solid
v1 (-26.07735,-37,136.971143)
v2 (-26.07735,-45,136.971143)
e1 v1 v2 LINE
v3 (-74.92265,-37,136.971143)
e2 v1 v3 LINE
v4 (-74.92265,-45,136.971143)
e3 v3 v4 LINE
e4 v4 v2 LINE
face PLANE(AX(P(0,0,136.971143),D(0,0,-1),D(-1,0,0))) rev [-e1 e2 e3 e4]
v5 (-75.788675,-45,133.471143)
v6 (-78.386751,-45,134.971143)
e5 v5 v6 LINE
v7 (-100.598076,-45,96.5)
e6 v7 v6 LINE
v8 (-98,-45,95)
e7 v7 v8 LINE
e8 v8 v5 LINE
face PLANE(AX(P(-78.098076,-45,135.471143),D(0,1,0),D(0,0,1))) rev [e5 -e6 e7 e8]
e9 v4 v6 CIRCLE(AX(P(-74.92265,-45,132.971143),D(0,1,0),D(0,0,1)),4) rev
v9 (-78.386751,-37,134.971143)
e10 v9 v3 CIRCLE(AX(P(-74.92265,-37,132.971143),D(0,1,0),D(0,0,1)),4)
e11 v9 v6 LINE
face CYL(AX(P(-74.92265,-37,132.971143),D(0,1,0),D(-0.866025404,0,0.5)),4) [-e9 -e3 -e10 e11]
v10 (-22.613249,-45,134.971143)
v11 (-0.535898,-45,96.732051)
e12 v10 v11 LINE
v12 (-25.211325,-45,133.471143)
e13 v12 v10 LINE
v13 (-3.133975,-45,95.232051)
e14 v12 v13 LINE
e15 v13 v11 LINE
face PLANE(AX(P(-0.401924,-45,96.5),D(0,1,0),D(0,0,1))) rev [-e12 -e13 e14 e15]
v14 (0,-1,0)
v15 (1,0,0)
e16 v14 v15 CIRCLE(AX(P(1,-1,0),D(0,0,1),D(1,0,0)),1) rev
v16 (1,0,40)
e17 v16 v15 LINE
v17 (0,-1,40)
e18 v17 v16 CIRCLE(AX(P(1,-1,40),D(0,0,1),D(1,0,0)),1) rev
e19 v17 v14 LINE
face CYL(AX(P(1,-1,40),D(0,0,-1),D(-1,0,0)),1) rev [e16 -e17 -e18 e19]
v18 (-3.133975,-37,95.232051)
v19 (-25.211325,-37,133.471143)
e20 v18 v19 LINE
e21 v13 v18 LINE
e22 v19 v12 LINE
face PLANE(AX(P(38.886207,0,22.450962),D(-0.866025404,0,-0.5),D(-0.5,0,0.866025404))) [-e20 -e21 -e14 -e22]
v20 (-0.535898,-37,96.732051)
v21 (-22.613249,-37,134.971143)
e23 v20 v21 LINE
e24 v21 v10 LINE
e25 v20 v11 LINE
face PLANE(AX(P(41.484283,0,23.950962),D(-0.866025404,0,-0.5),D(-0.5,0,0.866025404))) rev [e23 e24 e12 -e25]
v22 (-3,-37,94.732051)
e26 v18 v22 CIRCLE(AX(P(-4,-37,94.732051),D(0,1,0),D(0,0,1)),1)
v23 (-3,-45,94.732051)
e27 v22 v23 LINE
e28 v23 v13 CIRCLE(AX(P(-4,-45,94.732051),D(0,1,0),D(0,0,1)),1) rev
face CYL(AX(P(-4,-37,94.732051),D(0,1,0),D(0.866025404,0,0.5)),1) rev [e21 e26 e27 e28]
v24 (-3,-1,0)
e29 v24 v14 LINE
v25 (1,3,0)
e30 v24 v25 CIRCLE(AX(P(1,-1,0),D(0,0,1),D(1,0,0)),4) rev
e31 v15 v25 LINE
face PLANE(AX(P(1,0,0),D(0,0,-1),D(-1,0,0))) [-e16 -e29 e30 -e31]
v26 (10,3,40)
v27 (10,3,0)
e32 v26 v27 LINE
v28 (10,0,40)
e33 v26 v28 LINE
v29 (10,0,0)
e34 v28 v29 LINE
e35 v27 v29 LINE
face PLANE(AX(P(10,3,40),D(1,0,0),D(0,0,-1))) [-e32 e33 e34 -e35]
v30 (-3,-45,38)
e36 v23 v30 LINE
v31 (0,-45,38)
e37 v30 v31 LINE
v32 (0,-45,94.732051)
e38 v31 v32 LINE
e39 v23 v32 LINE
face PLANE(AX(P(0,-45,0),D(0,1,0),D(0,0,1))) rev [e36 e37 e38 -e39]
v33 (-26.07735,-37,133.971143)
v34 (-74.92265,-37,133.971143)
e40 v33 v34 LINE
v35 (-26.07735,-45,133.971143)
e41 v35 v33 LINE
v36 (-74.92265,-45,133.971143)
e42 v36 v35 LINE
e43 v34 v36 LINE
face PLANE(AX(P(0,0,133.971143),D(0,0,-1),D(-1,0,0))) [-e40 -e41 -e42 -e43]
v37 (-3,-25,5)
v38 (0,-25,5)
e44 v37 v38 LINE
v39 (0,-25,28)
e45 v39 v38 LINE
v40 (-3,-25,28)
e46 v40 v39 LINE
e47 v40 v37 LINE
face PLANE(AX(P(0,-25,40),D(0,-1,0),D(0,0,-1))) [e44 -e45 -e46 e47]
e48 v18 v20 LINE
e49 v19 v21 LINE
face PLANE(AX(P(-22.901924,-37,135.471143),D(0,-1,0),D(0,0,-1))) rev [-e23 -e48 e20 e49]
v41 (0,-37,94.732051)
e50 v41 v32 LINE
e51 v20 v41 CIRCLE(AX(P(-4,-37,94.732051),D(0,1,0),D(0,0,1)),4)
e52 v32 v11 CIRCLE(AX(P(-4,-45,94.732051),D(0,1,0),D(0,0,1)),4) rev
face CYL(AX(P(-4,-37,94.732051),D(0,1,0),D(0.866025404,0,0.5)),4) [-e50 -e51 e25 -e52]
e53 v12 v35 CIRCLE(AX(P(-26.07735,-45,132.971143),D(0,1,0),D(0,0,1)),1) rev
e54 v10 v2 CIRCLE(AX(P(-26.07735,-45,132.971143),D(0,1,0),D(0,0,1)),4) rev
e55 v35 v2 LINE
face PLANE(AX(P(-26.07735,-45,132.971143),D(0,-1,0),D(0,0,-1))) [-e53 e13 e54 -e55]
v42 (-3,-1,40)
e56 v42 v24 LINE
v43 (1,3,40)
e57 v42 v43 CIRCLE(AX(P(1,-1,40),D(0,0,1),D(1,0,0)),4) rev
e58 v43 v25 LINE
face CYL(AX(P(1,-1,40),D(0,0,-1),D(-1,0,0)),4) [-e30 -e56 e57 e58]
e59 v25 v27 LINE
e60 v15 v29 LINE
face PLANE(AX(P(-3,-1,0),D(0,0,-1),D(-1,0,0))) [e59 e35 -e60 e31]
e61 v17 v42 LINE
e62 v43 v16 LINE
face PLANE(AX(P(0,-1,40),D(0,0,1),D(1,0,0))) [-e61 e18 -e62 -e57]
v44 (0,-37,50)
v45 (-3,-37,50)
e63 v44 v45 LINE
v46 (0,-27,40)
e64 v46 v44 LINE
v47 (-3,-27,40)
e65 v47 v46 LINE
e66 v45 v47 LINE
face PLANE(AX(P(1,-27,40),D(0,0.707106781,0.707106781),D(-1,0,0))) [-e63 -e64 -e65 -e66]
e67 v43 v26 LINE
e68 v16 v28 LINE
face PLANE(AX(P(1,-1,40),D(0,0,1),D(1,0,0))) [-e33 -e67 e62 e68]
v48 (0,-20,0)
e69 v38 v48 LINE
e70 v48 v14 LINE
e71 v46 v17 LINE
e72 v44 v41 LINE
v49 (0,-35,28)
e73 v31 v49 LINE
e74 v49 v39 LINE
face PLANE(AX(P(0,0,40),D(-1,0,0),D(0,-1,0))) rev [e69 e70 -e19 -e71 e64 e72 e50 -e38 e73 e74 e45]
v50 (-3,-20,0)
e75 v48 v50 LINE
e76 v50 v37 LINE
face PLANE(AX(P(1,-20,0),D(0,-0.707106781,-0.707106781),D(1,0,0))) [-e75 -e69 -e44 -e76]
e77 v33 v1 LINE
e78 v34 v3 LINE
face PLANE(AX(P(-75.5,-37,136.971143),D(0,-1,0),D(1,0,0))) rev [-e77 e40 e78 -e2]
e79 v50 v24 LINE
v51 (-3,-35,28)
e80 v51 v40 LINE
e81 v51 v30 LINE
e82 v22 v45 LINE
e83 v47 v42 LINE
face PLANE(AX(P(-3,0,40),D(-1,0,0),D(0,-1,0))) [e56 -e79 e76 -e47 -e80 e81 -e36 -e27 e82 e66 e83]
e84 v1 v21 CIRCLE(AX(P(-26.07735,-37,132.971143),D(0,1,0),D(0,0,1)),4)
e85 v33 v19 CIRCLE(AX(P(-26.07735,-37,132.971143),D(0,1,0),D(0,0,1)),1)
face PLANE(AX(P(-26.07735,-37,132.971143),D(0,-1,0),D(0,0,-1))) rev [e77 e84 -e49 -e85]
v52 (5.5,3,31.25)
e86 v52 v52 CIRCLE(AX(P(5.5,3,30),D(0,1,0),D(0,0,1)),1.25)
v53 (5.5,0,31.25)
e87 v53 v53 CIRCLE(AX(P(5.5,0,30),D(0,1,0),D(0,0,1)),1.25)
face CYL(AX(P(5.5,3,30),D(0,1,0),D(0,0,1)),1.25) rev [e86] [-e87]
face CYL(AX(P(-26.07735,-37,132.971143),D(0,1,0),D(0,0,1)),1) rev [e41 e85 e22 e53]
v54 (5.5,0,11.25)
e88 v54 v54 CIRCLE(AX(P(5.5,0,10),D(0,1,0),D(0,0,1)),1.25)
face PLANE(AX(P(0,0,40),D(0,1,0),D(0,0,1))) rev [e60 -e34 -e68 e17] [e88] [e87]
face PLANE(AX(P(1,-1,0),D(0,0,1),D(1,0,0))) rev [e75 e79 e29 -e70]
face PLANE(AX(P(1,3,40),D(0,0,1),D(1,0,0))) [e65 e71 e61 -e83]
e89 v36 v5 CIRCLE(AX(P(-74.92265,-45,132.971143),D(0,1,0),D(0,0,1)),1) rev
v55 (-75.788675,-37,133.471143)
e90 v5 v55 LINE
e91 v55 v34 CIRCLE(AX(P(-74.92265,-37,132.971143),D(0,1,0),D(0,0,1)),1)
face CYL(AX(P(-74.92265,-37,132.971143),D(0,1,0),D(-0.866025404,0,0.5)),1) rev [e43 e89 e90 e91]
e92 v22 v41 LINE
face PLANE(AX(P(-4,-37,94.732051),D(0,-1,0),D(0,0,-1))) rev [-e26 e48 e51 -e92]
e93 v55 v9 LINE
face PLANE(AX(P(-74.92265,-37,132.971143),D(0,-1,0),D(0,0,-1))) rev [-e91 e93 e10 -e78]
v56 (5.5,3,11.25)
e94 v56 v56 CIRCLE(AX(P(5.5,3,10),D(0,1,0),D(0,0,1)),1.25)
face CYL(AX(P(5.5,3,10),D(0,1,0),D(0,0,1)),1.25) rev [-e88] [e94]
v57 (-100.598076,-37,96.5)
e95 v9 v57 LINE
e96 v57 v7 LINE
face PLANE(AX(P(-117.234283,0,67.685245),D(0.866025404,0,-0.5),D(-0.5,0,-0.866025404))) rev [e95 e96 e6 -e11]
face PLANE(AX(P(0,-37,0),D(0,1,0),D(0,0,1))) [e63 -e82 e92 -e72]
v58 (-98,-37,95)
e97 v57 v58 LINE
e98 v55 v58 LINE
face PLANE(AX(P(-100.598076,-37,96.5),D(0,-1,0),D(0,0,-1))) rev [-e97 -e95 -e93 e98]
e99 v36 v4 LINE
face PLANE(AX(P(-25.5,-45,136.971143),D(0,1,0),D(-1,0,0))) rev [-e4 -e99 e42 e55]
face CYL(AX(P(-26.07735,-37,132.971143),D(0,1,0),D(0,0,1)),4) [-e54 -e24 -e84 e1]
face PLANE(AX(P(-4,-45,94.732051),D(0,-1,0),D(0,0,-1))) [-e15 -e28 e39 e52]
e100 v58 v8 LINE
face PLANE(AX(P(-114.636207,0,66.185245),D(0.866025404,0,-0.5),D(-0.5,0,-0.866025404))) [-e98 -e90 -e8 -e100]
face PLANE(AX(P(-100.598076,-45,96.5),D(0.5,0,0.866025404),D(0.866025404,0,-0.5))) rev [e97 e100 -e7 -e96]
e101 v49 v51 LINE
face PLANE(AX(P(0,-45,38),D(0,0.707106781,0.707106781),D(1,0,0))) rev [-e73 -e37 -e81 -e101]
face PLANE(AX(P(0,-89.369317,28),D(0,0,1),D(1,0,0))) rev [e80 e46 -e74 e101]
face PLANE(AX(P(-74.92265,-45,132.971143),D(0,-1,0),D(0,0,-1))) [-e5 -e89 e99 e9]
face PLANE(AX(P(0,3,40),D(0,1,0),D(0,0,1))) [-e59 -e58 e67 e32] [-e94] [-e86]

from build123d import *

# Parameters (mm, degrees)
SM_BASE_FLANGE_1_DEPTH           = 40
M3X0_5_1_D                       = 2.5
SKETCH_22_W                      = 3
SKETCH_22_H                      = 12
EXTRUDE_6_DEPTH                  = 12
SKETCH_23_W                      = 3
SKETCH_23_H                      = 67
EXTRUDE_7_DEPTH                  = 8
CHAMFER_1_SIZE                   = 10
CHAMFER_2_SIZE                   = 5
SM_EDGE_FLANGE_1_STRIP_CUT_DEPTH = 8
SM_EDGE_FLANGE_1_DEPTH           = 8
SM_EDGE_FLANGE_2_STRIP_CUT_DEPTH = 8
SM_EDGE_FLANGE_2_DEPTH           = 8
SM_EDGE_FLANGE_3_STRIP_CUT_DEPTH = 8
SM_EDGE_FLANGE_3_DEPTH           = 8


# Sheet-metal steps are written as plain solids
with BuildPart() as part:
    # 草圖3 → 基材-凸緣1 (new body)
    with BuildSketch(Plane.XY):
        with BuildLine():
            Line((10, 0), (1, 0))
            ThreePointArc((1, 0), (0.292893219, -0.292893219), (0, -1))
            Line((0, -1), (0, -25))
            Line((0, -25), (-3, -25))
            Line((-3, -25), (-3, -1))
            ThreePointArc((-3, -1), (-1.828427125, 1.828427125), (1, 3))
            Line((1, 3), (10, 3))
            Line((10, 3), (10, 0))
        make_face()
    extrude(amount=SM_BASE_FLANGE_1_DEPTH)

    # M3x0.5 螺紋孔1 (through all)
    with Locations(Plane(origin=(0, 3, 0), x_dir=(1, 0, 0), z_dir=(0, 1, 0))):
        with Locations((5.5, -30), (5.5, -10)):
            Hole(M3X0_5_1_D / 2)

    # 草圖22 → 填料-伸長6 (add)
    with BuildSketch(Plane.XZ.offset(25)):
        with Locations((-1.5, 34)):
            Rectangle(SKETCH_22_W, SKETCH_22_H)
    extrude(amount=EXTRUDE_6_DEPTH)

    # 草圖23 → 填料-伸長7 (add)
    with BuildSketch(Plane.XZ.offset(37)):
        with Locations((-1.5, 61.5)):
            Rectangle(SKETCH_23_W, SKETCH_23_H)
    extrude(amount=EXTRUDE_7_DEPTH)

    # 導角1
    chamfer_1_edges = [part.edges().sort_by_distance(p)[0] for p in [
        (-1.5, -37, 40),
        (-1.5, -45, 28),
    ]]
    chamfer(chamfer_1_edges, length=CHAMFER_1_SIZE)

    # 導角2
    chamfer_2_edges = [part.edges().sort_by_distance(p)[0] for p in [
        (-1.5, -25, 0),
    ]]
    chamfer(chamfer_2_edges, length=CHAMFER_2_SIZE)

    # 邊線-凸緣1 strip (across the edge) → 邊線-凸緣1 strip cut (cut)
    with BuildSketch(Plane(origin=(-3, -45, 95), x_dir=(-0.8660254037844416, 0, -0.49999999999999495), z_dir=(0, 1, 0))):
        Polygon((-9.464101615, 10.392304845), (-2.464101615, -1.732050808), (0.133974596, -0.232050808), (-6.866025404, 11.892304845), align=None)
    extrude(amount=SM_EDGE_FLANGE_1_STRIP_CUT_DEPTH, mode=Mode.SUBTRACT)

    # 邊線-凸緣1 section (across the edge) → 邊線-凸緣1 (add)
    with BuildSketch(Plane(origin=(-3, -45, 95), x_dir=(-0.8660254037844416, 0, -0.49999999999999495), z_dir=(0, 1, 0))):
        with BuildLine():
            Line((-3, 0.267949192), (-3, 45))
            Line((-3, 45), (0, 45))
            Line((0, 45), (0, 0.267949192))
            ThreePointArc((0, 0.267949192), (0.034074174, 0.009130147), (0.133974596, -0.232050808))
            Line((0.133974596, -0.232050808), (-2.464101615, -1.732050808))
            ThreePointArc((-2.464101615, -1.732050808), (-2.863703305, -0.767326988), (-3, 0.267949192))
        make_face()
    extrude(amount=SM_EDGE_FLANGE_1_DEPTH)

    # 邊線-凸緣2 strip (across the edge) → 邊線-凸緣2 strip cut (cut)
    with BuildSketch(Plane(origin=(-25.5, -45, 133.97114317), x_dir=(0, 0, -1), z_dir=(0, 1, 0))):
        Polygon((-13.124355653, 4.113248654), (-1, -2.886751346), (0.5, -0.288675135), (-11.624355653, 6.711324865), align=None)
    extrude(amount=SM_EDGE_FLANGE_2_STRIP_CUT_DEPTH, mode=Mode.SUBTRACT)

    # 邊線-凸緣2 section (across the edge) → 邊線-凸緣2 (add)
    with BuildSketch(Plane(origin=(-25.5, -45, 133.97114317), x_dir=(0, 0, -1), z_dir=(0, 1, 0))):
        with BuildLine():
            Line((-3, 0.577350269), (-3, 50))
            Line((-3, 50), (0, 50))
            Line((0, 50), (0, 0.577350269))
            ThreePointArc((0, 0.577350269), (0.133974596, 0.077350269), (0.5, -0.288675135))
            Line((0.5, -0.288675135), (-1, -2.886751346))
            ThreePointArc((-1, -2.886751346), (-2.464101615, -1.422649731), (-3, 0.577350269))
        make_face()
    extrude(amount=SM_EDGE_FLANGE_2_DEPTH)

    # 邊線-凸緣3 strip (across the edge) → 邊線-凸緣3 strip cut (cut)
    with BuildSketch(Plane(origin=(-75.5, -45, 133.97114317), x_dir=(0.8660254037844312, 0, -0.5000000000000132), z_dir=(0, 1, 0))):
        Polygon((-13.124355653, 4.113248654), (-1, -2.886751346), (0.5, -0.288675135), (-11.624355653, 6.711324865), align=None)
    extrude(amount=SM_EDGE_FLANGE_3_STRIP_CUT_DEPTH, mode=Mode.SUBTRACT)

    # 邊線-凸緣3 section (across the edge) → 邊線-凸緣3 (add)
    with BuildSketch(Plane(origin=(-75.5, -45, 133.97114317), x_dir=(0.8660254037844312, 0, -0.5000000000000132), z_dir=(0, 1, 0))):
        with BuildLine():
            Line((-3, 0.577350269), (-3, 45))
            Line((-3, 45), (0, 45))
            Line((0, 45), (0, 0.577350269))
            ThreePointArc((0, 0.577350269), (0.133974596, 0.077350269), (0.5, -0.288675135))
            Line((0.5, -0.288675135), (-1, -2.886751346))
            ThreePointArc((-1, -2.886751346), (-2.464101615, -1.422649731), (-3, 0.577350269))
        make_face()
    extrude(amount=SM_EDGE_FLANGE_3_DEPTH)


solid = part.part
